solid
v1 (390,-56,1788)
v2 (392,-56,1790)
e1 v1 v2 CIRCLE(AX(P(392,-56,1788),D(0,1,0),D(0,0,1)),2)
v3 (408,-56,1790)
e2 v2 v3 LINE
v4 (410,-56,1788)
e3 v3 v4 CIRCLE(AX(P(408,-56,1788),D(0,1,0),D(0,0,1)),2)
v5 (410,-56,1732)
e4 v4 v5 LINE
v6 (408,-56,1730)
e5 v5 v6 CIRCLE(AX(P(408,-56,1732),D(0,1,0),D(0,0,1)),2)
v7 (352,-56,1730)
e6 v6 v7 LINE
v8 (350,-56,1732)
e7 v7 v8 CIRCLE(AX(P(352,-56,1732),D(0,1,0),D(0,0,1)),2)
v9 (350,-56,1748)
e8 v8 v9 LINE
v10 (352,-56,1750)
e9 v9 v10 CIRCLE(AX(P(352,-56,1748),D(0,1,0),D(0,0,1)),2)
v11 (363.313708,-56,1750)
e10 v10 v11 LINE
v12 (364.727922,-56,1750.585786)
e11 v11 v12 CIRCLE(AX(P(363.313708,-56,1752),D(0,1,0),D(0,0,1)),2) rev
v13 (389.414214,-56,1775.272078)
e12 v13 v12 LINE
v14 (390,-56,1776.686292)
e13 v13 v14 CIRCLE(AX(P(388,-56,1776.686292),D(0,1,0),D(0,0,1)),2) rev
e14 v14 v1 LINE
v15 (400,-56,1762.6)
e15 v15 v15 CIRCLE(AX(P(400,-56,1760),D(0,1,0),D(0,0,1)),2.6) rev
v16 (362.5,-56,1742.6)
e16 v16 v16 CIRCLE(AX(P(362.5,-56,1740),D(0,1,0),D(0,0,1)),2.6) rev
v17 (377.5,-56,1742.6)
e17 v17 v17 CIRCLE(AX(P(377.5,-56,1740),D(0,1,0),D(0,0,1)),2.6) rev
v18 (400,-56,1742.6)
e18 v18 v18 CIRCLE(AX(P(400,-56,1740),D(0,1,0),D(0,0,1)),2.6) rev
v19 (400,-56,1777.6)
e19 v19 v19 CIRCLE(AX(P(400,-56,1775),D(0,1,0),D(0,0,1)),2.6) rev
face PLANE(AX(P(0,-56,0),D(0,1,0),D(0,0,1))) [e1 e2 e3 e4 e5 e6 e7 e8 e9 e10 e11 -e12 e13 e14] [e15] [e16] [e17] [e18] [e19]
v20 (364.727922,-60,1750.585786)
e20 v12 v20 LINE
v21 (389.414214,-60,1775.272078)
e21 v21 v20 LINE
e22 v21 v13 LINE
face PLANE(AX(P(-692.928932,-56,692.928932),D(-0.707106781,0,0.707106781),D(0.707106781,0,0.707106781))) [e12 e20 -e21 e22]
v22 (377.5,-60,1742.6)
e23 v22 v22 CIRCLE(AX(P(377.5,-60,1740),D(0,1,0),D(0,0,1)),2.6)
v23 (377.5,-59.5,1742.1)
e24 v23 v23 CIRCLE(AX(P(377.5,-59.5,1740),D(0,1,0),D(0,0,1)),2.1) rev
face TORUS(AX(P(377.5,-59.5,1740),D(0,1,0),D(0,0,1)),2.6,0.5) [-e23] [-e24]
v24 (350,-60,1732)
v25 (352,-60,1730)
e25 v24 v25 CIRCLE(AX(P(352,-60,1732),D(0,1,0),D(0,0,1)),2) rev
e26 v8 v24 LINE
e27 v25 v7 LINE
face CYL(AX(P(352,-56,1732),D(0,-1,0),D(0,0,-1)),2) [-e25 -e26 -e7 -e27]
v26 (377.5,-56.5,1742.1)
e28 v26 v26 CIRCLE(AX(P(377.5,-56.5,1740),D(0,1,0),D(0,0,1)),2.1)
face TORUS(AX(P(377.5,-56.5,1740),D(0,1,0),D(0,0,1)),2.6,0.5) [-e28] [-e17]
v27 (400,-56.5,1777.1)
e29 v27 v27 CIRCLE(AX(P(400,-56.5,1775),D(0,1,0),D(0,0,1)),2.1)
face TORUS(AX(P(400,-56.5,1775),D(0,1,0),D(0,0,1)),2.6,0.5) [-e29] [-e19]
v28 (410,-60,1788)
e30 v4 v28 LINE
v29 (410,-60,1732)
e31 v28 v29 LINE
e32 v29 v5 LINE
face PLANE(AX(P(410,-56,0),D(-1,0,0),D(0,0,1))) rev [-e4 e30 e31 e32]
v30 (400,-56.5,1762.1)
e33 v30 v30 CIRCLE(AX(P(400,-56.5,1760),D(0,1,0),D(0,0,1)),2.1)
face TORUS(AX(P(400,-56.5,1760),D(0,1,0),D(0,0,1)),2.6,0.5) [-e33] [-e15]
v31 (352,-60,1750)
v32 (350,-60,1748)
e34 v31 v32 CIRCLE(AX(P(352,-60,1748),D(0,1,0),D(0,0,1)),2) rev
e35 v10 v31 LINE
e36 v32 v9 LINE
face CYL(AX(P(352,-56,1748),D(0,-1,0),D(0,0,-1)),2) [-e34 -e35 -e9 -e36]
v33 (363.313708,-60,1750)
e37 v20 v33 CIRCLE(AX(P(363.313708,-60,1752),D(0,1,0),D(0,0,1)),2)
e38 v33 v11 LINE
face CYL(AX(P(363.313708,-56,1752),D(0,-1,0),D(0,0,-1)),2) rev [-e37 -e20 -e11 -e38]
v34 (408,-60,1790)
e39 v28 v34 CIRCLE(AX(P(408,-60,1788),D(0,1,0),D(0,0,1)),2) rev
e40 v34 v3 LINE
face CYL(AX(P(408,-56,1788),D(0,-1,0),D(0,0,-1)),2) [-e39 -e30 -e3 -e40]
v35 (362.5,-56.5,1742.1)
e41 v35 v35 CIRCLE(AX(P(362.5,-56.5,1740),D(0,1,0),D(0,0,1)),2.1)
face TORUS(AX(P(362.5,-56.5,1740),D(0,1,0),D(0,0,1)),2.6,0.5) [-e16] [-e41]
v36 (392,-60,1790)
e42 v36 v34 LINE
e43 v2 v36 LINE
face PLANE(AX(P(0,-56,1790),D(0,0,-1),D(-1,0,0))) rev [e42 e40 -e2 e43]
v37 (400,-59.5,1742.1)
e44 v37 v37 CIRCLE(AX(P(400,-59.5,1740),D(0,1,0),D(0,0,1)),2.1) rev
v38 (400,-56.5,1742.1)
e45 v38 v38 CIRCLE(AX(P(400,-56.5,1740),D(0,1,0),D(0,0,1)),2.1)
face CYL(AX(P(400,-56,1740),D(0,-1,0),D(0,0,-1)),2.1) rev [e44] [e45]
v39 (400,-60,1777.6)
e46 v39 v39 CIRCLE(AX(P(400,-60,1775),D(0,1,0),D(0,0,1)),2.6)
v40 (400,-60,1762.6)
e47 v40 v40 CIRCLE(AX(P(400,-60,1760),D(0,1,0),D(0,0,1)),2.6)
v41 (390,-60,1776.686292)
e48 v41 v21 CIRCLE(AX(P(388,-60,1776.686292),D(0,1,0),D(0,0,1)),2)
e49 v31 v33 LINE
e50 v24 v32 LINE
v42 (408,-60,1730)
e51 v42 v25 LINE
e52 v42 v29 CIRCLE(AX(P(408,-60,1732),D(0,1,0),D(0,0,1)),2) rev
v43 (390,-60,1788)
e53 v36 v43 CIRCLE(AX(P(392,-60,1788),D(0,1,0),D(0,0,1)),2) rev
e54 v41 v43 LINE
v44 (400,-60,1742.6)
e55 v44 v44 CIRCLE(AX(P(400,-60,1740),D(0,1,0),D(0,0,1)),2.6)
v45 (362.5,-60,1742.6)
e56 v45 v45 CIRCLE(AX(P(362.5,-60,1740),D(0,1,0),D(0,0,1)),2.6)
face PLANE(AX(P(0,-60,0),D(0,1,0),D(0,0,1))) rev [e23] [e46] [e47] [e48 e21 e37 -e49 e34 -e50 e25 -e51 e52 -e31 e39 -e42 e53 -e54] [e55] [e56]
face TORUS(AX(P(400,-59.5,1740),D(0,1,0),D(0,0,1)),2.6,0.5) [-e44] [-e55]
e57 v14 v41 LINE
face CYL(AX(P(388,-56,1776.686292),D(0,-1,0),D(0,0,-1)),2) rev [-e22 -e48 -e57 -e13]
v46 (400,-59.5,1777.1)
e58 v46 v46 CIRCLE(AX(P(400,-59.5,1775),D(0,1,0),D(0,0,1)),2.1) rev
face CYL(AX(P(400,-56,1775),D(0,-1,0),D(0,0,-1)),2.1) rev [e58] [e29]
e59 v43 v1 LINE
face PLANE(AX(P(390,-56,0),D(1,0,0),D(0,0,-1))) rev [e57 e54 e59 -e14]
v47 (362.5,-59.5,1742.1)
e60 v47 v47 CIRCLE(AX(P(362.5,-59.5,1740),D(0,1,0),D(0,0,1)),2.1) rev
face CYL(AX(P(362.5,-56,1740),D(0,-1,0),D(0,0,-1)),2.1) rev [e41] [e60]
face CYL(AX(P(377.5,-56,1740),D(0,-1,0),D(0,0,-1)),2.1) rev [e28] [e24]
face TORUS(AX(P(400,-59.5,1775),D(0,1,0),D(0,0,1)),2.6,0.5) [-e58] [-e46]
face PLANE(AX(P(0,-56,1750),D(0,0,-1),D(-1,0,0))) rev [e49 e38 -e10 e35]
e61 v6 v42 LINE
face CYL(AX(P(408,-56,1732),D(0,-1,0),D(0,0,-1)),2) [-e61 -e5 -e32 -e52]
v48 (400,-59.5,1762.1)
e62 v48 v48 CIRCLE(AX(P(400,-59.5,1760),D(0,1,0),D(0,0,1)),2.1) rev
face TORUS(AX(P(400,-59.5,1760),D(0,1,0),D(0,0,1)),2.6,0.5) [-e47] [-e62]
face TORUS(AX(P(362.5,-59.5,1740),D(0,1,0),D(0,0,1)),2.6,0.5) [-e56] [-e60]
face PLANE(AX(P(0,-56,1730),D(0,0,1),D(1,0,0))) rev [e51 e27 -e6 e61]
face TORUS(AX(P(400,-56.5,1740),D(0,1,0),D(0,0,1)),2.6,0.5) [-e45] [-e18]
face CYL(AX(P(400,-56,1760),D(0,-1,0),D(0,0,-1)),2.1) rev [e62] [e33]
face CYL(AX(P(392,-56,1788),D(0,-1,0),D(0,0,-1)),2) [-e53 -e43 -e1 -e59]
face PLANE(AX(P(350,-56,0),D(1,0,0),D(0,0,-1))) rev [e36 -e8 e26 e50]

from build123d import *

# Parameters (mm, degrees)
STOCK_MASTER_SKETCH_002_1_START     = -60
STOCK_MASTER_SKETCH_002_1_OUTLINE_R = 2.1
STOCK_MASTER_SKETCH_002_1_DEPTH     = 4
FILLET1_R                           = 2
FILLET2_R                           = 0.5


# Read off the part's stored shape, not the designer's step: Stock-master_sketch_002-1
with BuildPart() as part:
    # Stock-master_sketch_002-1 outline → Stock-master_sketch_002-1 (new body)
    with BuildSketch(Plane(origin=(0, 0, 0), x_dir=(1, 0, 0), z_dir=(0, 1, 0)).offset(STOCK_MASTER_SKETCH_002_1_START)):
        Polygon((410, -1790), (410, -1730), (350, -1730), (350, -1750), (364.142135624, -1750), (390, -1775.857864376), (390, -1790), align=None)
        with Locations((400, -1775)):
            Circle(STOCK_MASTER_SKETCH_002_1_OUTLINE_R, mode=Mode.SUBTRACT)
        with Locations((362.5, -1740)):
            Circle(STOCK_MASTER_SKETCH_002_1_OUTLINE_R, mode=Mode.SUBTRACT)
        with Locations((377.5, -1740)):
            Circle(STOCK_MASTER_SKETCH_002_1_OUTLINE_R, mode=Mode.SUBTRACT)
        with Locations((400, -1760)):
            Circle(STOCK_MASTER_SKETCH_002_1_OUTLINE_R, mode=Mode.SUBTRACT)
        with Locations((400, -1740)):
            Circle(STOCK_MASTER_SKETCH_002_1_OUTLINE_R, mode=Mode.SUBTRACT)
    extrude(amount=STOCK_MASTER_SKETCH_002_1_DEPTH)

    # Fillet1
    fillet1_edges = [part.edges().sort_by_distance(p)[0] for p in [
        (410, -58, 1790),
        (390, -58, 1790),
        (390, -58, 1775.857864376),
        (364.142135624, -58, 1750),
        (350, -58, 1750),
        (350, -58, 1730),
        (410, -58, 1730),
    ]]
    fillet(fillet1_edges, radius=FILLET1_R)

    # Fillet2
    fillet2_edges = [part.edges().sort_by_distance(p)[0] for p in [
        (397.9, -56, 1775),
        (397.9, -56, 1760),
        (375.4, -60, 1740),
        (360.4, -60, 1740),
        (397.9, -56, 1740),
        (397.9, -60, 1740),
        (397.9, -60, 1760),
        (397.9, -60, 1775),
        (360.4, -56, 1740),
        (375.4, -56, 1740),
    ]]
    fillet(fillet2_edges, radius=FILLET2_R)


solid = part.part
